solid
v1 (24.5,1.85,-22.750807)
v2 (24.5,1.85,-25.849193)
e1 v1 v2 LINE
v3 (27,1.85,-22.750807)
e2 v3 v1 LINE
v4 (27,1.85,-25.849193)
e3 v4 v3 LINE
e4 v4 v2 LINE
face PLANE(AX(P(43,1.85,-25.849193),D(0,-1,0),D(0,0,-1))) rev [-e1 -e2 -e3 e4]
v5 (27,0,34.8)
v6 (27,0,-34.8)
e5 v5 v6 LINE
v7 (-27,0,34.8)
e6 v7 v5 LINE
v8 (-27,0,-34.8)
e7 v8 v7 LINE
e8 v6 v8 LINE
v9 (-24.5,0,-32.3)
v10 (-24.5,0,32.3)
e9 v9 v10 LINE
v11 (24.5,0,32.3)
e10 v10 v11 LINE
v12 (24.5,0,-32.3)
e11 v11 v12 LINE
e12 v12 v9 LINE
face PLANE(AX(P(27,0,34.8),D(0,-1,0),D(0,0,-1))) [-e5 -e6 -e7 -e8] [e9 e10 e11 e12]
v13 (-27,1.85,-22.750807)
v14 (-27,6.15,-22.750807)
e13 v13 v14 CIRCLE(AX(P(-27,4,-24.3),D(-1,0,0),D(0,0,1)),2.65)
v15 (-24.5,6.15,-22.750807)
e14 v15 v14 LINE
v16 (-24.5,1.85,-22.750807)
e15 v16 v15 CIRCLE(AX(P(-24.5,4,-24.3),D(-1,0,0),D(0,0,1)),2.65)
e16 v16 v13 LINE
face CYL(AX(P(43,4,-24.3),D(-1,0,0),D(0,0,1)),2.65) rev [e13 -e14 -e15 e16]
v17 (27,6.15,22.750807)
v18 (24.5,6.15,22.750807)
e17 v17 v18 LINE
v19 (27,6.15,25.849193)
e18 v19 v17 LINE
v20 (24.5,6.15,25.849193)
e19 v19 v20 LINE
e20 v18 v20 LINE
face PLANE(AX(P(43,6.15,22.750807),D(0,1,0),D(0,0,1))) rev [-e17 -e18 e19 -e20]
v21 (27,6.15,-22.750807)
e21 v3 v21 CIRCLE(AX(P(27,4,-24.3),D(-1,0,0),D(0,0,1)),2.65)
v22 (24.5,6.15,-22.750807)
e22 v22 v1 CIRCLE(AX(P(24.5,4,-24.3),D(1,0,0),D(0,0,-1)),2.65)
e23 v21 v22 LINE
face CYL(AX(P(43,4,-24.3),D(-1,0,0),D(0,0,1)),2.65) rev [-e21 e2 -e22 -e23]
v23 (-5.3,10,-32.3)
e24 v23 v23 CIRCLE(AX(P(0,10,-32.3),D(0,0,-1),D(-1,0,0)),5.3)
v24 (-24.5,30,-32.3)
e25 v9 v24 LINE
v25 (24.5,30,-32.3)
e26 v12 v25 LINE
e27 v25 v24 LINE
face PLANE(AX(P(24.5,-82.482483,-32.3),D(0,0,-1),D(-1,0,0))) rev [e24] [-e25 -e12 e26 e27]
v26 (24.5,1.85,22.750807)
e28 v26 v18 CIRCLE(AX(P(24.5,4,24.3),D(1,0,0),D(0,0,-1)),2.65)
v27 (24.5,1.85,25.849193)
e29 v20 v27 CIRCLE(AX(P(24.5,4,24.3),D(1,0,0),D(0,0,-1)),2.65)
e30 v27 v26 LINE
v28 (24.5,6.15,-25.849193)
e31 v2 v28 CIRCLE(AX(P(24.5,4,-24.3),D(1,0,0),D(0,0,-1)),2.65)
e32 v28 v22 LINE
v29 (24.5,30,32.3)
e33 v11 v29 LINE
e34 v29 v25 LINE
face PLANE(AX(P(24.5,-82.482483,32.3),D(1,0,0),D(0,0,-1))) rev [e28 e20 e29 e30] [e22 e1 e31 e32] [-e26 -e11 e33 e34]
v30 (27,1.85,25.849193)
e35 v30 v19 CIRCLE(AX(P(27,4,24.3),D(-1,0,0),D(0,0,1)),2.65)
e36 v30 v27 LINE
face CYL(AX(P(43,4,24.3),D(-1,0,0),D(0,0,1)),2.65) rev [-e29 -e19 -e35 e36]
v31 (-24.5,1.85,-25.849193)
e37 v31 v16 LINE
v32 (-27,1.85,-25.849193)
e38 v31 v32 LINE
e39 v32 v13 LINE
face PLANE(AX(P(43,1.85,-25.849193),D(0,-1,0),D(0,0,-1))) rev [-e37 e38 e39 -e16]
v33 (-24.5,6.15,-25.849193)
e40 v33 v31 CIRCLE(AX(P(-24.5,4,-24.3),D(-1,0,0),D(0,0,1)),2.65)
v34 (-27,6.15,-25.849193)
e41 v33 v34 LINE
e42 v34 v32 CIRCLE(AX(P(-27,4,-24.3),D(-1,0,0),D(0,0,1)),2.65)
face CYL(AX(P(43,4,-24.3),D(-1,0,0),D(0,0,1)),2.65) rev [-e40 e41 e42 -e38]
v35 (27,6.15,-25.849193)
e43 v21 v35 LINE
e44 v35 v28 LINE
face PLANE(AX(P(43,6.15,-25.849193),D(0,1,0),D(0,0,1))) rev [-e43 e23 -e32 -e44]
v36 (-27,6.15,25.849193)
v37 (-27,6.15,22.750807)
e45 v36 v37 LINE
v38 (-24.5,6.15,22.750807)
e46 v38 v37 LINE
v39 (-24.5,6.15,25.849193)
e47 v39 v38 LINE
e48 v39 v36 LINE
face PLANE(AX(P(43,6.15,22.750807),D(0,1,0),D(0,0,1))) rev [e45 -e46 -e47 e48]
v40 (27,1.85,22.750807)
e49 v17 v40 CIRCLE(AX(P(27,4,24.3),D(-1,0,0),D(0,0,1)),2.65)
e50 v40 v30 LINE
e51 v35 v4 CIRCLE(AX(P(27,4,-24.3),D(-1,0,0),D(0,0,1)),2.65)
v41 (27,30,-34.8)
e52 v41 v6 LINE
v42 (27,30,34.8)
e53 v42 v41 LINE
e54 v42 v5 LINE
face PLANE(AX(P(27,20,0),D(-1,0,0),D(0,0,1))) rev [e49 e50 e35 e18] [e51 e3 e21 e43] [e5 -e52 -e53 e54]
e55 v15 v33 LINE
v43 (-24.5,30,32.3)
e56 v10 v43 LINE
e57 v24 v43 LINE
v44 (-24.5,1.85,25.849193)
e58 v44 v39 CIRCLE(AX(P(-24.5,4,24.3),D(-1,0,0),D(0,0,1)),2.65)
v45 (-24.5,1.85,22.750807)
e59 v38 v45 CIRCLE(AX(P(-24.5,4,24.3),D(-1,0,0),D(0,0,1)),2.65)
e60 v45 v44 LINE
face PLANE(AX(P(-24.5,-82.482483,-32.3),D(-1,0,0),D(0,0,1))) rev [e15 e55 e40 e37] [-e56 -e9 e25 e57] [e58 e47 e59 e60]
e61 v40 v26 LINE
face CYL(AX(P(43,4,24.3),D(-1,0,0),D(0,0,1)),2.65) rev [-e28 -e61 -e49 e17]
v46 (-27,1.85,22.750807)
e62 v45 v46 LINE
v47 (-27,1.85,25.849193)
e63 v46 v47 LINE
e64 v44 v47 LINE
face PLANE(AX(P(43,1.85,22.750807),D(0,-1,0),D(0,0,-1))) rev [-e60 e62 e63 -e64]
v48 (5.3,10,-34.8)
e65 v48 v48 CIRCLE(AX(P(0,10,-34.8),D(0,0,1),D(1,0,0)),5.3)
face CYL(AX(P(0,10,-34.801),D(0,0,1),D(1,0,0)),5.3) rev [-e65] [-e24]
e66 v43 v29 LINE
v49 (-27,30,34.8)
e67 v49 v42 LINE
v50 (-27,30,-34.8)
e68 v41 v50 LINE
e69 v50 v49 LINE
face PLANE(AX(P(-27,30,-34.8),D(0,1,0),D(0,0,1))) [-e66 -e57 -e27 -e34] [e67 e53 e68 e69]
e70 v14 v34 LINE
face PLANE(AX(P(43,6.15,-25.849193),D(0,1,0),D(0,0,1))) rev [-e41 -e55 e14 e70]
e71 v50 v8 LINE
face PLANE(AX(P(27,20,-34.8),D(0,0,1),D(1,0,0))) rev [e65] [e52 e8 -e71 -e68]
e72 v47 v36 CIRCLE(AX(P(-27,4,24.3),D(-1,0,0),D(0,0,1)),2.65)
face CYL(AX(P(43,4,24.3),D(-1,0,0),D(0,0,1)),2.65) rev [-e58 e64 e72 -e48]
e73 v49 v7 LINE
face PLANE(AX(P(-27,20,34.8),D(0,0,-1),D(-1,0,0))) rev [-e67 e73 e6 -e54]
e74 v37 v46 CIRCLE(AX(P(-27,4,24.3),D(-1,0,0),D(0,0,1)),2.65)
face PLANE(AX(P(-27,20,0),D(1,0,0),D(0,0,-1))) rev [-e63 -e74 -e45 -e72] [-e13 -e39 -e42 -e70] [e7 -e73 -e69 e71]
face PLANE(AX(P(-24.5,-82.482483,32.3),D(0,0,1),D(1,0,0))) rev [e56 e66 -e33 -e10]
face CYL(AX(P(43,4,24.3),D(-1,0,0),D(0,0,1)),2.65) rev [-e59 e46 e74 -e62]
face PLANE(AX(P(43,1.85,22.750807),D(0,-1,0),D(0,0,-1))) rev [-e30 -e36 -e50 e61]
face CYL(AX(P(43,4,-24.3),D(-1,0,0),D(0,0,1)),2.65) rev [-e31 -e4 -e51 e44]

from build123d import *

# Parameters (mm, degrees)
BOSS_EXTRUDE1_DEPTH = 20
LOFT1_START         = -34.8
LOFT1_DEPTH         = 69.6
LOFT1_START_2       = -28
LOFT1_2_DEPTH       = 56
BOSS_EXTRUDE2_START = -2
BOSS_EXTRUDE2_DEPTH = 50
BOSS_EXTRUDE3_DEPTH = 2.3
BOSS_EXTRUDE4_DEPTH = 2.3
SKETCH9_W           = 56.929943861
SKETCH9_H           = 73.17042397
BOSS_EXTRUDE5_DEPTH = 34
SKETCH10_W          = 54
SKETCH10_H          = 69.6
SKETCH10_W_2        = 50
SKETCH10_H_2        = 65.6
BOSS_EXTRUDE6_DEPTH = 10
SKETCH11_W          = 50
SKETCH11_H          = 65.6
SKETCH11_W_2        = 49
SKETCH11_H_2        = 64.6
BOSS_EXTRUDE7_DEPTH = 30
CUT_EXTRUDE1_START  = -69.6
SKETCH7_R           = 5.3
CUT_EXTRUDE1_DEPTH  = 2.5
CUT_EXTRUDE2_DEPTH  = 70


with BuildPart() as part:
    # Sketch1 → Boss-Extrude1 (new body)
    with BuildSketch(Plane(origin=(0, 0, 0), x_dir=(1, 0, 0), z_dir=(0, 1, 0))):
        Polygon((27, 34.8), (-27, 34.8), (-27, 0), (-27, -34.8), (27, -34.8), (27, 0), align=None)
        Polygon((25, 0), (25, 32.8), (-25, 32.8), (-25, 0), (-25, -32.8), (25, -32.8), align=None, mode=Mode.SUBTRACT)
    extrude(amount=BOSS_EXTRUDE1_DEPTH)

    # Loft1: read off the stored shape, not the designer's step
    # Loft1 outline → Loft1 (add)
    with BuildSketch(Plane.XY.offset(LOFT1_START)):
        Polygon((-27, 20), (27, 20), (25, 35), (-25, 35), align=None)
    extrude(amount=LOFT1_DEPTH)

    # Loft1 2 outline → Loft1 2 (cut)
    with BuildSketch(Plane.YZ.offset(LOFT1_START_2)):
        Polygon((20, 34.8), (35, 32.8), (35, 34.8), align=None)
        Polygon((35, -32.8), (20, -34.8), (35, -34.8), align=None)
    extrude(amount=LOFT1_2_DEPTH, mode=Mode.SUBTRACT)

    # Cut-Loft1: read off the stored shape, not the designer's step
    # Cut-Loft1: loft between two sections, ruled curve by curve
    cut_loft1_from = [
        Edge.make_line((-25, 20, 32.8), (-25, 20, -32.8)),
        Edge.make_line((-25, 20, -32.8), (25, 20, -32.8)),
        Edge.make_line((25, 20, 32.8), (-25, 20, 32.8)),
        Edge.make_line((25, 20, -32.8), (25, 20, 32.8)),
    ]
    cut_loft1_to = [
        Edge.make_line((-23, 35, 30.8), (-23, 35, -30.8)),
        Edge.make_line((-23, 35, -30.8), (23, 35, -30.8)),
        Edge.make_line((23, 35, 30.8), (-23, 35, 30.8)),
        Edge.make_line((23, 35, -30.8), (23, 35, 30.8)),
    ]
    cut_loft1 = Solid(Shell([*[Face.make_surface_from_curves(cut_loft1_from[k], cut_loft1_to[k]) for k in range(4)], Face(Wire(cut_loft1_from)), Face(Wire(cut_loft1_to))]))
    add(cut_loft1, mode=Mode.SUBTRACT)

    # Sketch2 → Boss-Extrude2 (add)
    with BuildSketch(Plane(origin=(27, 0, 0), x_dir=(0, 0, -1), z_dir=(1, 0, 0)).offset(BOSS_EXTRUDE2_START)):
        with BuildLine():
            Line((32.8, 35), (32.8, 38.5))
            ThreePointArc((32.8, 38.5), (32.653553391, 38.853553391), (32.3, 39))
            Line((32.3, 39), (29.6, 39))
            ThreePointArc((29.6, 39), (29.246446609, 38.853553391), (29.1, 38.5))
            Line((29.1, 38.5), (29.1, 37.468550682))
            ThreePointArc((29.1, 37.468550682), (29.138060234, 37.277208966), (29.246446609, 37.114997291))
            Line((29.246446609, 37.114997291), (31.361443901, 35))
            Line((31.361443901, 35), (32.8, 35))
        make_face()
    extrude(amount=-BOSS_EXTRUDE2_DEPTH)


with BuildPart() as body_2:
    # Sketch5 → Boss-Extrude3 (new body)
    with BuildSketch(Plane.XZ):
        with BuildLine():
            Line((-25, -34.8), (-25, -9.8))
            ThreePointArc((-25, -9.8), (0, 15.2), (25, -9.8))
            Line((25, -9.8), (25, -34.8))
            Line((25, -34.8), (27, -34.8))
            Line((27, -34.8), (27, 34.8))
            Line((27, 34.8), (-27, 34.8))
            Line((-27, 34.8), (-27, -34.8))
            Line((-27, -34.8), (-25, -34.8))
        make_face()
    extrude(amount=BOSS_EXTRUDE3_DEPTH)

    # Sketch6 → Boss-Extrude4 (add)
    with BuildSketch(Plane.XZ.offset(2.3)):
        with BuildLine():
            Line((22.7, -34.8), (27, -34.8))
            Line((27, -34.8), (27, 34.8))
            Line((27, 34.8), (-27, 34.8))
            Line((-27, 34.8), (-27, -34.8))
            Line((-27, -34.8), (-22.7, -34.8))
            Line((-22.7, -34.8), (-22.7, -9.8))
            ThreePointArc((-22.7, -9.8), (0, 12.9), (22.7, -9.8))
            Line((22.7, -9.8), (22.7, -34.8))
        make_face()
    extrude(amount=BOSS_EXTRUDE4_DEPTH)


with BuildPart() as body_2_2:
    # Sketch9 → Boss-Extrude5 (new body)
    with BuildSketch(Plane(origin=(0, 20, 0), x_dir=(-1, 0, 0), z_dir=(0, 1, 0))):
        with Locations((0.264790437, -0.308922176)):
            Rectangle(SKETCH9_W, SKETCH9_H)
    extrude(amount=BOSS_EXTRUDE5_DEPTH)


with BuildPart() as part_1:
    add(part.part)

    # Combine1: cut body 2 2
    add(body_2_2.part, mode=Mode.SUBTRACT)

    # Sketch10 → Boss-Extrude6 (add)
    with BuildSketch(Plane(origin=(0, 20, 0), x_dir=(1, 0, 0), z_dir=(0, 1, 0))):
        Rectangle(SKETCH10_W, SKETCH10_H)
        Rectangle(SKETCH10_W_2, SKETCH10_H_2, mode=Mode.SUBTRACT)
    extrude(amount=BOSS_EXTRUDE6_DEPTH)

    # Sketch11 → Boss-Extrude7 (add)
    with BuildSketch(Plane(origin=(0, 30, 0), x_dir=(1, 0, 0), z_dir=(0, 1, 0))):
        Rectangle(SKETCH11_W, SKETCH11_H)
        Rectangle(SKETCH11_W_2, SKETCH11_H_2, mode=Mode.SUBTRACT)
    extrude(amount=-BOSS_EXTRUDE7_DEPTH)

    # Sketch7 → Cut-Extrude1 (cut)
    with BuildSketch(Plane.XY.offset(34.8).offset(CUT_EXTRUDE1_START)):
        with Locations((0, 10)):
            Circle(SKETCH7_R)
    extrude(amount=CUT_EXTRUDE1_DEPTH, mode=Mode.SUBTRACT)

    # Sketch8 → Cut-Extrude2 (cut)
    with BuildSketch(Plane.ZY.offset(27)):
        with BuildLine():
            Line((22.750806662, 6.15), (25.849193338, 6.15))
            ThreePointArc((25.849193338, 6.15), (26.95, 4), (25.849193338, 1.85))
            Line((25.849193338, 1.85), (22.750806662, 1.85))
            ThreePointArc((22.750806662, 1.85), (21.65, 4), (22.750806662, 6.15))
        make_face()
        with BuildLine():
            Line((-25.849193338, 6.15), (-22.750806662, 6.15))
            ThreePointArc((-22.750806662, 6.15), (-21.65, 4), (-22.750806662, 1.85))
            Line((-22.750806662, 1.85), (-25.849193338, 1.85))
            ThreePointArc((-25.849193338, 1.85), (-26.95, 4), (-25.849193338, 6.15))
        make_face()
    extrude(amount=-CUT_EXTRUDE2_DEPTH, mode=Mode.SUBTRACT)


solid = part_1.part
